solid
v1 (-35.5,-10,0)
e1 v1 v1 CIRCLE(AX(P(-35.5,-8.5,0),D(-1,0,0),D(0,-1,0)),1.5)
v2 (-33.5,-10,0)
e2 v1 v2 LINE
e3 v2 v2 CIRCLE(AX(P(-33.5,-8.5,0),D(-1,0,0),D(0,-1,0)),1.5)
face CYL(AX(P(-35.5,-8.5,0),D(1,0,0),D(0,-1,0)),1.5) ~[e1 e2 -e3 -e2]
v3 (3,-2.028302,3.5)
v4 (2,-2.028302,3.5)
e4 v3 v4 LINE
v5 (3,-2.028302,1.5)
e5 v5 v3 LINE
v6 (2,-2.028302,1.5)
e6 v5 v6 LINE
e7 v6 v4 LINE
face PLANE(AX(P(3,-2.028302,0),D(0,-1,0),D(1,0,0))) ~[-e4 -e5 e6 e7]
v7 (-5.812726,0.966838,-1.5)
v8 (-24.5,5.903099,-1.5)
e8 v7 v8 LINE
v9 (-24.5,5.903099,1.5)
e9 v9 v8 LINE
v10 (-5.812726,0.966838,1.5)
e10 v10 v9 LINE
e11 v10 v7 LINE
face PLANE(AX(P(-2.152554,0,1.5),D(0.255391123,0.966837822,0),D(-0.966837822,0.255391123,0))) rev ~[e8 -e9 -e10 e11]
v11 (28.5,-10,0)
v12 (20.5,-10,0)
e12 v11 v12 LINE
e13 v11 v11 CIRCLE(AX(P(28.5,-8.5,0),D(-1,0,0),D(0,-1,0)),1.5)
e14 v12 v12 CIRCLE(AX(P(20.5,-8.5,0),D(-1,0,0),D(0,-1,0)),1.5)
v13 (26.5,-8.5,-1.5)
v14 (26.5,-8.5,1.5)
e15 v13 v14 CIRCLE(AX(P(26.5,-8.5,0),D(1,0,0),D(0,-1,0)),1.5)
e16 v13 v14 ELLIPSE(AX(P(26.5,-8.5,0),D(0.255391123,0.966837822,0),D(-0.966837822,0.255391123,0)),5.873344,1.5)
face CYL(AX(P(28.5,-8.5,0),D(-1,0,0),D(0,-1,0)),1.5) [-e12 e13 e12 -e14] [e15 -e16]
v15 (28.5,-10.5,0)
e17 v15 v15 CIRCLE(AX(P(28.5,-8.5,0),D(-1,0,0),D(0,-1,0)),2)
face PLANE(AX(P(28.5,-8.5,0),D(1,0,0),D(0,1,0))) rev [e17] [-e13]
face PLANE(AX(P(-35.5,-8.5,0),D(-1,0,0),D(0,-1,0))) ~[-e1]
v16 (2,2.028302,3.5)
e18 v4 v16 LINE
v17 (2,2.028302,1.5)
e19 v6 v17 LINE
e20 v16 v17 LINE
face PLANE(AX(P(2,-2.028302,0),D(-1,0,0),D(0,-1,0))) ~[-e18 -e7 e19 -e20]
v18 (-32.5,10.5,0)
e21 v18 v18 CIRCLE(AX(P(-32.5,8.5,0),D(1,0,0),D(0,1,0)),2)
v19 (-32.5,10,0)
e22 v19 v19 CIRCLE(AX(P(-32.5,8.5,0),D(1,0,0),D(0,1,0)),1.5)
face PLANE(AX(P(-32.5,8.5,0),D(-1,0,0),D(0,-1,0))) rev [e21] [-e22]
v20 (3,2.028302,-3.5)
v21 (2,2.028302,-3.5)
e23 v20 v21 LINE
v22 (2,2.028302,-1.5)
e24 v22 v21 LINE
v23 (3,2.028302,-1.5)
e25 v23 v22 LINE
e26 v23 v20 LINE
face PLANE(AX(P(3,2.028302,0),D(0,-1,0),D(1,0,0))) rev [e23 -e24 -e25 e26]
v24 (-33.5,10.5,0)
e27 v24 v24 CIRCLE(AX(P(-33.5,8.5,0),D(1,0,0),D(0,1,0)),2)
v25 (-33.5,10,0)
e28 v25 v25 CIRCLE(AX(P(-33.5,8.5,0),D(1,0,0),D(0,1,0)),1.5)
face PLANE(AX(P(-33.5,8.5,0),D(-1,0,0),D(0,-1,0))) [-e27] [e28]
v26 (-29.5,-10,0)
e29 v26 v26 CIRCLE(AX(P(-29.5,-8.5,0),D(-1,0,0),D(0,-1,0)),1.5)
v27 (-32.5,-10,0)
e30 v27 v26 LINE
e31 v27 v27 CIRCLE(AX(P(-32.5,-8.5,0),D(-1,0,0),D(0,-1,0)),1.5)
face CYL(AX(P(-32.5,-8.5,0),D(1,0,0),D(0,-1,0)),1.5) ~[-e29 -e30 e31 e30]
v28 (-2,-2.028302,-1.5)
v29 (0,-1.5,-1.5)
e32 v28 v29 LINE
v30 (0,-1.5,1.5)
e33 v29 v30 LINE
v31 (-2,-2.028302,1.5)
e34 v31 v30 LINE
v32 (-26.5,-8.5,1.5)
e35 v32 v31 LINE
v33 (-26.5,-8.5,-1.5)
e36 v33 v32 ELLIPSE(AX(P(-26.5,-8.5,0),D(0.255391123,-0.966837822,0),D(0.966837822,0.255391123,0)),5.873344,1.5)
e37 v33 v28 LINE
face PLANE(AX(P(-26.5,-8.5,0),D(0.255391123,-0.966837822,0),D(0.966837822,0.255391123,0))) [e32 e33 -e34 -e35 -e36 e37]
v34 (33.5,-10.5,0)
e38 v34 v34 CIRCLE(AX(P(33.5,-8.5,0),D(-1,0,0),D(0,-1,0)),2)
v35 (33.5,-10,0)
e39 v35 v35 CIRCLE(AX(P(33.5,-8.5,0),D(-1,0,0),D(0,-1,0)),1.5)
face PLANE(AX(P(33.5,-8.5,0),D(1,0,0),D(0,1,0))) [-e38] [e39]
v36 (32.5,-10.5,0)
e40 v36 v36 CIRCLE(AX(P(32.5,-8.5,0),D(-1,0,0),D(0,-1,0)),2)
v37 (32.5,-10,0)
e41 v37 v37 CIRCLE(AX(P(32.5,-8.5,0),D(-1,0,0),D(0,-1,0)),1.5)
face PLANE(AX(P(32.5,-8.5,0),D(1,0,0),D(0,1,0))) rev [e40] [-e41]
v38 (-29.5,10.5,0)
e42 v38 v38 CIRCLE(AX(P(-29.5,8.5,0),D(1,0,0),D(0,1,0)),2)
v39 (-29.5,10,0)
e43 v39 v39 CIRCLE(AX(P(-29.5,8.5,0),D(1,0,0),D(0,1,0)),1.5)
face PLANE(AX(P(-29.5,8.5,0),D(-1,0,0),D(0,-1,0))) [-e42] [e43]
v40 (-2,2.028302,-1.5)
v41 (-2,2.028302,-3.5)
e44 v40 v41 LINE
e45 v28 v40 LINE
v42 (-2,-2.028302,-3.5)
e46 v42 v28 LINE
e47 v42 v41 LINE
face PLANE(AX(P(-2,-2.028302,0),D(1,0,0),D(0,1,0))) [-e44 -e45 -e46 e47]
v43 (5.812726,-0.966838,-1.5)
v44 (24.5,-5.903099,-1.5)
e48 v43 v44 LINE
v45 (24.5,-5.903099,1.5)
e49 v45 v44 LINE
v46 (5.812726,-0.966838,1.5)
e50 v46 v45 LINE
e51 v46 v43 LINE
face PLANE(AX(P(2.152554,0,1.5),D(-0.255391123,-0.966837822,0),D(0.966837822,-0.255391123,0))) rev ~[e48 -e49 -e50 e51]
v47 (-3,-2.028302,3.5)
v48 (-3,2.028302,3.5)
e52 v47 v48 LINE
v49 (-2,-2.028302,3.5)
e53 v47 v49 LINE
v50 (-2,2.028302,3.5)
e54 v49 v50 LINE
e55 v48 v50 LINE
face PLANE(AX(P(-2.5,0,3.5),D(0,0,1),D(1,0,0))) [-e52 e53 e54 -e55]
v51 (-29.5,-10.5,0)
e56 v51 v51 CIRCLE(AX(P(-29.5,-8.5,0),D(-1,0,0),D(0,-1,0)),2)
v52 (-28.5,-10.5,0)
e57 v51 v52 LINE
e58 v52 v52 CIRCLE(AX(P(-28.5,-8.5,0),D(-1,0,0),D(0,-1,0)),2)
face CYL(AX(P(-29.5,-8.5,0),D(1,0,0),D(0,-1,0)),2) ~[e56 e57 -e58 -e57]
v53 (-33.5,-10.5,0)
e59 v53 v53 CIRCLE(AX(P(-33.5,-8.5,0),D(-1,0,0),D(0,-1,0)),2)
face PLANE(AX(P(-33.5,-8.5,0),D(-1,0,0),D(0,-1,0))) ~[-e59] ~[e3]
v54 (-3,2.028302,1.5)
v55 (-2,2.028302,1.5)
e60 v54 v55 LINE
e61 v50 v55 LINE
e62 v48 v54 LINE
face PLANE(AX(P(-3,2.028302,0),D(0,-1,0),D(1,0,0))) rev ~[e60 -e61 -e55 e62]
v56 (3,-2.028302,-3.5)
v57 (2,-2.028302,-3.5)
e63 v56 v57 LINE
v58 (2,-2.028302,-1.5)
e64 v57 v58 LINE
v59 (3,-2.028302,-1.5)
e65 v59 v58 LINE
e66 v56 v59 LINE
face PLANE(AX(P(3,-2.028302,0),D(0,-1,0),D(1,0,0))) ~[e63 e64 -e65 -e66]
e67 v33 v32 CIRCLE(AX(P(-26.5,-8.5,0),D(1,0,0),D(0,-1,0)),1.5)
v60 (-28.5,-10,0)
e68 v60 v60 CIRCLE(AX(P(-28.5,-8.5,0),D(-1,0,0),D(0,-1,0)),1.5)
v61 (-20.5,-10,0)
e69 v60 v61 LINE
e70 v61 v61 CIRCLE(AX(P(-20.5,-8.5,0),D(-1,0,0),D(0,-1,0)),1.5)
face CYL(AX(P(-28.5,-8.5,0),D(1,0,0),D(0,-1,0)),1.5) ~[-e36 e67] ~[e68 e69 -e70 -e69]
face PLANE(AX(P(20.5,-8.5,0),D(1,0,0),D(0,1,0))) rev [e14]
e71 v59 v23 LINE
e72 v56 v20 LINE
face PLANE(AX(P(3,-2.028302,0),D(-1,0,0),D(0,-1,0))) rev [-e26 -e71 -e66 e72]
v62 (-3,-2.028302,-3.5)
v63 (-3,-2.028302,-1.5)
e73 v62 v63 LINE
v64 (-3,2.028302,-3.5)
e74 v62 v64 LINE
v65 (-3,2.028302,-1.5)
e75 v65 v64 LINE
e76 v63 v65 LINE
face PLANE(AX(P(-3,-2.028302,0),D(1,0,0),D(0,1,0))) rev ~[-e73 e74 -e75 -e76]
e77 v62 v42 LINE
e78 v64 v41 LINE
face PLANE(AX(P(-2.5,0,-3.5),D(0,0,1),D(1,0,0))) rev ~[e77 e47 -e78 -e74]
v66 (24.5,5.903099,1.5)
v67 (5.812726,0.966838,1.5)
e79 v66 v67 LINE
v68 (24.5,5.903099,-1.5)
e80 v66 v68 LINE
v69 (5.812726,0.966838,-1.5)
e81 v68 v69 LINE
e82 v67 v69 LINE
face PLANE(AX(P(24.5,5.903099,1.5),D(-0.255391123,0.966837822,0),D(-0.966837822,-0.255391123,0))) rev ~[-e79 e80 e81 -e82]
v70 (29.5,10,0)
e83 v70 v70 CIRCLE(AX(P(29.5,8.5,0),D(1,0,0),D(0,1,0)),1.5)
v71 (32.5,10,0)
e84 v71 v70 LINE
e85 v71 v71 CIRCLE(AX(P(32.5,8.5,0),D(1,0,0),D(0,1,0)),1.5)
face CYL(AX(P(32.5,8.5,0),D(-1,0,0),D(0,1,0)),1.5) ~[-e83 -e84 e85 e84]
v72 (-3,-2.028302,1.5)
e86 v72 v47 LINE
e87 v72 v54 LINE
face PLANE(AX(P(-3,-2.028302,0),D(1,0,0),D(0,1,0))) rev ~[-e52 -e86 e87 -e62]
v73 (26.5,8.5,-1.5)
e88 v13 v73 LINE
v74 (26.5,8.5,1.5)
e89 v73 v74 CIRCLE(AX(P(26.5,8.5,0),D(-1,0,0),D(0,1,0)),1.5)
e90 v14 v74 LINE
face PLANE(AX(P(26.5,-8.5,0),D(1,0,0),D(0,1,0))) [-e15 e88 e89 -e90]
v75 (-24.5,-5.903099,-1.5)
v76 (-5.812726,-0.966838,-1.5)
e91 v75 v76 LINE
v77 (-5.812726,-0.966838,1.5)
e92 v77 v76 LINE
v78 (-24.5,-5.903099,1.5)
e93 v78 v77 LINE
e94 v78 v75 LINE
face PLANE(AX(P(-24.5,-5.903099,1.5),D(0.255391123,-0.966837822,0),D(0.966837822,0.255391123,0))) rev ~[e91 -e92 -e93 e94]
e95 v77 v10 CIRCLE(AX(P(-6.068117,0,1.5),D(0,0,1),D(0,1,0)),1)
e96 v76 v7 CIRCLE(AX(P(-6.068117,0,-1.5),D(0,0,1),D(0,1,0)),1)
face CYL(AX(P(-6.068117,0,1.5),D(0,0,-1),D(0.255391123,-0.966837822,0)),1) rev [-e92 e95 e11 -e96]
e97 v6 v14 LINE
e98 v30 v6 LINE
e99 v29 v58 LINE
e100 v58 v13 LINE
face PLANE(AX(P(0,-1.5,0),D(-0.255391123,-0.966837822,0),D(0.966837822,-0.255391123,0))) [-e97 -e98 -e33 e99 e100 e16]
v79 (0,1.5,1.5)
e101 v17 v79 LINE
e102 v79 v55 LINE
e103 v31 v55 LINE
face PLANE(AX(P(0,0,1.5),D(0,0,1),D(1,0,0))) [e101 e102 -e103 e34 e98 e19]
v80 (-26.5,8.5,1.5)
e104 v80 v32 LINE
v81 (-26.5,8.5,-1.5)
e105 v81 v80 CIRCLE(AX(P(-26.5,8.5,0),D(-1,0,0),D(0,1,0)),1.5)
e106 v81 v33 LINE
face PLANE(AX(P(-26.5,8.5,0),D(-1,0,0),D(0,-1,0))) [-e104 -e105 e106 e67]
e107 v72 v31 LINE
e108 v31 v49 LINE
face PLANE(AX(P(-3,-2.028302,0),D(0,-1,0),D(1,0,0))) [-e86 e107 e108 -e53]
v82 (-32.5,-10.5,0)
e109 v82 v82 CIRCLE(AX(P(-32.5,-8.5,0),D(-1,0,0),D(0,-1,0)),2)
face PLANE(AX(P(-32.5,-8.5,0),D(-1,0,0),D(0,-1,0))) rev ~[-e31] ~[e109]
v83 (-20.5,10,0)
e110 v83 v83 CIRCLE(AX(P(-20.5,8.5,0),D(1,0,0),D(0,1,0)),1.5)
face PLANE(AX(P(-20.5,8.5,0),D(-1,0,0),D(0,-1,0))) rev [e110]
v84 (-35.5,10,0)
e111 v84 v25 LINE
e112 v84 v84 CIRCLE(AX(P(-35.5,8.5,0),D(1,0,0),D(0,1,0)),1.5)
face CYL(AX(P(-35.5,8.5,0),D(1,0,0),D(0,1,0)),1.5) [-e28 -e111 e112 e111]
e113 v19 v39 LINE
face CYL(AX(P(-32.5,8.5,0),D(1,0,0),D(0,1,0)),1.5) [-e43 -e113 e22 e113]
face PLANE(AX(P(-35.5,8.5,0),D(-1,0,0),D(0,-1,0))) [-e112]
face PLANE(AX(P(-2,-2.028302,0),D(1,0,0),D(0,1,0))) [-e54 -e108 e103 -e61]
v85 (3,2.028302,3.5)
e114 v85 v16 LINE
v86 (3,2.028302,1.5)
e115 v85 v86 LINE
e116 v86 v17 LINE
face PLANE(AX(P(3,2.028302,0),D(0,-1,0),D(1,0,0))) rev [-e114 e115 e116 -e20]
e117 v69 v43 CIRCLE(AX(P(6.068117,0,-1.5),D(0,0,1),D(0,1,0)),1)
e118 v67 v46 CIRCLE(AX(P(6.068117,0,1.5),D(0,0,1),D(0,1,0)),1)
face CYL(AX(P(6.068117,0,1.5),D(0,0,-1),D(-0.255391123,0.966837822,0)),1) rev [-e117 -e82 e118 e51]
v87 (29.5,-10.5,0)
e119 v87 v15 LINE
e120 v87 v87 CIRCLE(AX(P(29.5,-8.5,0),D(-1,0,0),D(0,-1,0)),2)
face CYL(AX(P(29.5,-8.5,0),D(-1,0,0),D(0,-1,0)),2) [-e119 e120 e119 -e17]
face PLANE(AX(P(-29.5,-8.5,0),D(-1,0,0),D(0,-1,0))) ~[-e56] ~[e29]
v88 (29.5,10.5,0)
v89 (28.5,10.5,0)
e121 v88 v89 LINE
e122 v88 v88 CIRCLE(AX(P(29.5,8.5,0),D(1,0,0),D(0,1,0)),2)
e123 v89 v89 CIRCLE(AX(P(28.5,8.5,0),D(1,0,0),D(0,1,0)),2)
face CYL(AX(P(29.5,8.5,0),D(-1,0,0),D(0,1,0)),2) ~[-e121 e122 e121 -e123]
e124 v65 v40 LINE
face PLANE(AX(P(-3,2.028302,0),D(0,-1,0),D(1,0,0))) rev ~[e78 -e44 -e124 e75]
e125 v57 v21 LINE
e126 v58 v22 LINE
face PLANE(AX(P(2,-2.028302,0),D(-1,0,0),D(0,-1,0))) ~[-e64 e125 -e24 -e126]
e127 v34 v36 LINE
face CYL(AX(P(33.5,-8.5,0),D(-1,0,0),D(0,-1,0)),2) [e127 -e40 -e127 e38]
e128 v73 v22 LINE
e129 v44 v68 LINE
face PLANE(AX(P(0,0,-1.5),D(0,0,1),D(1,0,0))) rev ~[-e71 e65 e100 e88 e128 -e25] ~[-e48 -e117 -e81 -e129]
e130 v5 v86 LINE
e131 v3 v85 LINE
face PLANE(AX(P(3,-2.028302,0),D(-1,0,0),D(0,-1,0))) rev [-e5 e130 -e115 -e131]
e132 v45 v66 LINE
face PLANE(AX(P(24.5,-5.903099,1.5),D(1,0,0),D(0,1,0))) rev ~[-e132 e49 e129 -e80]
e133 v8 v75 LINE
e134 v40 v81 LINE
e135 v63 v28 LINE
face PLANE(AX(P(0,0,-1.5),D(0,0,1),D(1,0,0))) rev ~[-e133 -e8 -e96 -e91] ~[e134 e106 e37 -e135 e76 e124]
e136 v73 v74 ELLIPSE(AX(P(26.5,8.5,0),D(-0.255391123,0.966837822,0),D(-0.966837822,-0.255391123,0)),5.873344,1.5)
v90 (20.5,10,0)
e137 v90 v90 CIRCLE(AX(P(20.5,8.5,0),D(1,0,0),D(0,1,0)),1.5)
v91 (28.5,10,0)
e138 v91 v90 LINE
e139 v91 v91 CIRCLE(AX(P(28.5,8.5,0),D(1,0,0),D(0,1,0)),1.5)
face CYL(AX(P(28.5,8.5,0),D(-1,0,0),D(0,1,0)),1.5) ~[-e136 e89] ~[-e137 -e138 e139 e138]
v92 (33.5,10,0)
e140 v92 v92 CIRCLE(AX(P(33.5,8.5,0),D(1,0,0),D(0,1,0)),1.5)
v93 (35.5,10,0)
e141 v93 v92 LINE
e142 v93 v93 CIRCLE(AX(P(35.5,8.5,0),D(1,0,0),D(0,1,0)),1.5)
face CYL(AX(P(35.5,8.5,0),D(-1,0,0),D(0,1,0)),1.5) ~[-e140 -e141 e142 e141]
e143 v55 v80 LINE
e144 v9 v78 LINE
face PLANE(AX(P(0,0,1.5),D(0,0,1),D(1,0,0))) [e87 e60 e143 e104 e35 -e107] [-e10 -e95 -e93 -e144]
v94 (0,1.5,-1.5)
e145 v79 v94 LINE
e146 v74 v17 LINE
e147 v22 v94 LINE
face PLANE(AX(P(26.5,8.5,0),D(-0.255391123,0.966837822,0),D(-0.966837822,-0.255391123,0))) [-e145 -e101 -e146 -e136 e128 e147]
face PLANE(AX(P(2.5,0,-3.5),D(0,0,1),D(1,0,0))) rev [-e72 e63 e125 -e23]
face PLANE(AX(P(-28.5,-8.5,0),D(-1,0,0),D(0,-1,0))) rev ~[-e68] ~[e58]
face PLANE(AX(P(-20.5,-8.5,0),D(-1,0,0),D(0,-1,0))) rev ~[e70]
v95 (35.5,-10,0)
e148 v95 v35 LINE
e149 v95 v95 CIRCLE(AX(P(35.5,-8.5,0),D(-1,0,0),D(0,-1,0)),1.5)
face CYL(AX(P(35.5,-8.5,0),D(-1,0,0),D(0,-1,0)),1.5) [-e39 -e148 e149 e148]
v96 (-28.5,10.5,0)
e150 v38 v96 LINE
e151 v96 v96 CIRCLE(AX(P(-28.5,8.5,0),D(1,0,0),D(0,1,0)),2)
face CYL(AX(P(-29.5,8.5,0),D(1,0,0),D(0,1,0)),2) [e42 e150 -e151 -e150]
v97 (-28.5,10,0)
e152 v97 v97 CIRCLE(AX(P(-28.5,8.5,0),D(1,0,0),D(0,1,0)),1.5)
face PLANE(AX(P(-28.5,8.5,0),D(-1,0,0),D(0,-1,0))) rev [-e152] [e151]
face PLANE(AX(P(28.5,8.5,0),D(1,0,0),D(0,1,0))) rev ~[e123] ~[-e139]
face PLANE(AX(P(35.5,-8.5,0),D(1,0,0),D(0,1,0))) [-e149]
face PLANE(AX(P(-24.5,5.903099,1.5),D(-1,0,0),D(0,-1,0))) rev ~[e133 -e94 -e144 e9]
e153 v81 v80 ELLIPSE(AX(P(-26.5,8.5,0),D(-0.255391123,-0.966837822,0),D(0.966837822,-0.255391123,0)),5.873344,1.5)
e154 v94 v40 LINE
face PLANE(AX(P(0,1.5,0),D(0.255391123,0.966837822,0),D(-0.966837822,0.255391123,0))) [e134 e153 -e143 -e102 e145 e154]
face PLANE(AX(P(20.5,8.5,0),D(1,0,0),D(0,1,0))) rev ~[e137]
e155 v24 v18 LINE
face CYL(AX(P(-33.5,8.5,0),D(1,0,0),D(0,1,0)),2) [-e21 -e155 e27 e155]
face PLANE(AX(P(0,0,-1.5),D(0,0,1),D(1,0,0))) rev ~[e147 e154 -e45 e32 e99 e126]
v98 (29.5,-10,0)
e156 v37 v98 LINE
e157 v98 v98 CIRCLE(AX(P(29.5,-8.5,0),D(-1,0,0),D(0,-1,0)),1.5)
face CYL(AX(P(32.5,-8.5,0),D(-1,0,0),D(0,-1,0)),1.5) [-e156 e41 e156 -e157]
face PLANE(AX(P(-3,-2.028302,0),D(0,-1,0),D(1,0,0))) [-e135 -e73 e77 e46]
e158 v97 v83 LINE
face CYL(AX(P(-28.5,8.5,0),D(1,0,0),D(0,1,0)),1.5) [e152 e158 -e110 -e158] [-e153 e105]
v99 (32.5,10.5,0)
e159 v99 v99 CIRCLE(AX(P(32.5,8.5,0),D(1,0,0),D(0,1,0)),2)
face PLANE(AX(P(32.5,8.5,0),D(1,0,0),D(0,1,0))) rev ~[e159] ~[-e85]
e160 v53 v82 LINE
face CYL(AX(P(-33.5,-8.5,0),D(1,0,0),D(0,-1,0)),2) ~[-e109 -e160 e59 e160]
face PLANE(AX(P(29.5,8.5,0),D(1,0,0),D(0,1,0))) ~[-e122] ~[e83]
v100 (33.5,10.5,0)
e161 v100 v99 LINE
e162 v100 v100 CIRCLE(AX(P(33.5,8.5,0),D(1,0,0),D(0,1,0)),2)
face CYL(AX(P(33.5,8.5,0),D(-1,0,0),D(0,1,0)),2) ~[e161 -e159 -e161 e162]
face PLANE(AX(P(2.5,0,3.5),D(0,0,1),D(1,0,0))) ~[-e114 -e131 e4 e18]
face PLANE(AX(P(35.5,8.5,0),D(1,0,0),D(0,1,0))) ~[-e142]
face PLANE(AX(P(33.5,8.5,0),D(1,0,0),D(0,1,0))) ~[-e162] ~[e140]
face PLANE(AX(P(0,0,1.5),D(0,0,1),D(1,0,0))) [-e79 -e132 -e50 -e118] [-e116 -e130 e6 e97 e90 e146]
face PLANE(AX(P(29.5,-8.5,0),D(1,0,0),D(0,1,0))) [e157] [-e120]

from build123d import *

# Parameters (mm, degrees)
F1_DEPTH = 1.5
F3_DEPTH = 3.001
F4_R     = 1
F7_W     = 1
F7_H     = 4.0566037736
F8_DEPTH = 3.5


# Not quite as in the source:
# - a feature names something its author has since deleted; it is built from what else it names


with BuildPart() as f1:
    # F0 (on Top) → F1 (new body, symmetric)
    with BuildSketch(Plane.XY):
        Polygon((0, 1.5), (-26.5, 8.5), (-26.5, 0), (-26.5, -8.5), (0, -1.5), (26.5, -8.5), (26.5, 0), (26.5, 8.5), align=None)
    extrude(amount=F1_DEPTH, both=True)

    # F2 (on face) → F3 (cut, through all)
    with BuildSketch(Plane.XY.offset(1.5)):
        Polygon((-24.5, 5.9030988568), (-24.5, 0), (-24.5, -5.9030988568), (-2.1525543278, 0), align=None)
        Polygon((24.5, 0), (24.5, 5.9030988568), (2.1525543278, 0), (24.5, -5.9030988568), align=None)
    extrude(amount=-F3_DEPTH, mode=Mode.SUBTRACT)

    # F4
    f4_edges = [f1.edges().sort_by_distance(p)[0] for p in [
        (-2.152554, 0, 0),
        (2.152554, 0, 0),
    ]]
    fillet(f4_edges, radius=F4_R)

    # F5 (on Top) → F6 (revolve)
    with BuildSketch(Plane.XY):
        Polygon((20.5, 8.5), (35.5, 8.5), (35.5, 10), (33.5, 10), (33.5, 10.5), (32.5, 10.5), (32.5, 10), (29.5, 10), (29.5, 10.5), (28.5, 10.5), (28.5, 10), (20.5, 10), align=None)
    revolve(axis=Axis((28, 8.5, 0), (1, 0, 0)))

    # F7 (on Top) → F8 (join, symmetric)
    with BuildSketch(Plane.XY):
        with Locations((-2.5, 0)):
            Rectangle(F7_W, F7_H)
    extrude(amount=F8_DEPTH, both=True)

    # F9: F1 across plane


with BuildPart() as f1_1:
    add(f1.part)
    add(f1.part.mirror(Plane.YZ))

    # F10: F1 across plane


with BuildPart() as f1_2:
    add(f1_1.part)
    add(f1_1.part.mirror(Plane.XZ))


solid = f1_2.part
